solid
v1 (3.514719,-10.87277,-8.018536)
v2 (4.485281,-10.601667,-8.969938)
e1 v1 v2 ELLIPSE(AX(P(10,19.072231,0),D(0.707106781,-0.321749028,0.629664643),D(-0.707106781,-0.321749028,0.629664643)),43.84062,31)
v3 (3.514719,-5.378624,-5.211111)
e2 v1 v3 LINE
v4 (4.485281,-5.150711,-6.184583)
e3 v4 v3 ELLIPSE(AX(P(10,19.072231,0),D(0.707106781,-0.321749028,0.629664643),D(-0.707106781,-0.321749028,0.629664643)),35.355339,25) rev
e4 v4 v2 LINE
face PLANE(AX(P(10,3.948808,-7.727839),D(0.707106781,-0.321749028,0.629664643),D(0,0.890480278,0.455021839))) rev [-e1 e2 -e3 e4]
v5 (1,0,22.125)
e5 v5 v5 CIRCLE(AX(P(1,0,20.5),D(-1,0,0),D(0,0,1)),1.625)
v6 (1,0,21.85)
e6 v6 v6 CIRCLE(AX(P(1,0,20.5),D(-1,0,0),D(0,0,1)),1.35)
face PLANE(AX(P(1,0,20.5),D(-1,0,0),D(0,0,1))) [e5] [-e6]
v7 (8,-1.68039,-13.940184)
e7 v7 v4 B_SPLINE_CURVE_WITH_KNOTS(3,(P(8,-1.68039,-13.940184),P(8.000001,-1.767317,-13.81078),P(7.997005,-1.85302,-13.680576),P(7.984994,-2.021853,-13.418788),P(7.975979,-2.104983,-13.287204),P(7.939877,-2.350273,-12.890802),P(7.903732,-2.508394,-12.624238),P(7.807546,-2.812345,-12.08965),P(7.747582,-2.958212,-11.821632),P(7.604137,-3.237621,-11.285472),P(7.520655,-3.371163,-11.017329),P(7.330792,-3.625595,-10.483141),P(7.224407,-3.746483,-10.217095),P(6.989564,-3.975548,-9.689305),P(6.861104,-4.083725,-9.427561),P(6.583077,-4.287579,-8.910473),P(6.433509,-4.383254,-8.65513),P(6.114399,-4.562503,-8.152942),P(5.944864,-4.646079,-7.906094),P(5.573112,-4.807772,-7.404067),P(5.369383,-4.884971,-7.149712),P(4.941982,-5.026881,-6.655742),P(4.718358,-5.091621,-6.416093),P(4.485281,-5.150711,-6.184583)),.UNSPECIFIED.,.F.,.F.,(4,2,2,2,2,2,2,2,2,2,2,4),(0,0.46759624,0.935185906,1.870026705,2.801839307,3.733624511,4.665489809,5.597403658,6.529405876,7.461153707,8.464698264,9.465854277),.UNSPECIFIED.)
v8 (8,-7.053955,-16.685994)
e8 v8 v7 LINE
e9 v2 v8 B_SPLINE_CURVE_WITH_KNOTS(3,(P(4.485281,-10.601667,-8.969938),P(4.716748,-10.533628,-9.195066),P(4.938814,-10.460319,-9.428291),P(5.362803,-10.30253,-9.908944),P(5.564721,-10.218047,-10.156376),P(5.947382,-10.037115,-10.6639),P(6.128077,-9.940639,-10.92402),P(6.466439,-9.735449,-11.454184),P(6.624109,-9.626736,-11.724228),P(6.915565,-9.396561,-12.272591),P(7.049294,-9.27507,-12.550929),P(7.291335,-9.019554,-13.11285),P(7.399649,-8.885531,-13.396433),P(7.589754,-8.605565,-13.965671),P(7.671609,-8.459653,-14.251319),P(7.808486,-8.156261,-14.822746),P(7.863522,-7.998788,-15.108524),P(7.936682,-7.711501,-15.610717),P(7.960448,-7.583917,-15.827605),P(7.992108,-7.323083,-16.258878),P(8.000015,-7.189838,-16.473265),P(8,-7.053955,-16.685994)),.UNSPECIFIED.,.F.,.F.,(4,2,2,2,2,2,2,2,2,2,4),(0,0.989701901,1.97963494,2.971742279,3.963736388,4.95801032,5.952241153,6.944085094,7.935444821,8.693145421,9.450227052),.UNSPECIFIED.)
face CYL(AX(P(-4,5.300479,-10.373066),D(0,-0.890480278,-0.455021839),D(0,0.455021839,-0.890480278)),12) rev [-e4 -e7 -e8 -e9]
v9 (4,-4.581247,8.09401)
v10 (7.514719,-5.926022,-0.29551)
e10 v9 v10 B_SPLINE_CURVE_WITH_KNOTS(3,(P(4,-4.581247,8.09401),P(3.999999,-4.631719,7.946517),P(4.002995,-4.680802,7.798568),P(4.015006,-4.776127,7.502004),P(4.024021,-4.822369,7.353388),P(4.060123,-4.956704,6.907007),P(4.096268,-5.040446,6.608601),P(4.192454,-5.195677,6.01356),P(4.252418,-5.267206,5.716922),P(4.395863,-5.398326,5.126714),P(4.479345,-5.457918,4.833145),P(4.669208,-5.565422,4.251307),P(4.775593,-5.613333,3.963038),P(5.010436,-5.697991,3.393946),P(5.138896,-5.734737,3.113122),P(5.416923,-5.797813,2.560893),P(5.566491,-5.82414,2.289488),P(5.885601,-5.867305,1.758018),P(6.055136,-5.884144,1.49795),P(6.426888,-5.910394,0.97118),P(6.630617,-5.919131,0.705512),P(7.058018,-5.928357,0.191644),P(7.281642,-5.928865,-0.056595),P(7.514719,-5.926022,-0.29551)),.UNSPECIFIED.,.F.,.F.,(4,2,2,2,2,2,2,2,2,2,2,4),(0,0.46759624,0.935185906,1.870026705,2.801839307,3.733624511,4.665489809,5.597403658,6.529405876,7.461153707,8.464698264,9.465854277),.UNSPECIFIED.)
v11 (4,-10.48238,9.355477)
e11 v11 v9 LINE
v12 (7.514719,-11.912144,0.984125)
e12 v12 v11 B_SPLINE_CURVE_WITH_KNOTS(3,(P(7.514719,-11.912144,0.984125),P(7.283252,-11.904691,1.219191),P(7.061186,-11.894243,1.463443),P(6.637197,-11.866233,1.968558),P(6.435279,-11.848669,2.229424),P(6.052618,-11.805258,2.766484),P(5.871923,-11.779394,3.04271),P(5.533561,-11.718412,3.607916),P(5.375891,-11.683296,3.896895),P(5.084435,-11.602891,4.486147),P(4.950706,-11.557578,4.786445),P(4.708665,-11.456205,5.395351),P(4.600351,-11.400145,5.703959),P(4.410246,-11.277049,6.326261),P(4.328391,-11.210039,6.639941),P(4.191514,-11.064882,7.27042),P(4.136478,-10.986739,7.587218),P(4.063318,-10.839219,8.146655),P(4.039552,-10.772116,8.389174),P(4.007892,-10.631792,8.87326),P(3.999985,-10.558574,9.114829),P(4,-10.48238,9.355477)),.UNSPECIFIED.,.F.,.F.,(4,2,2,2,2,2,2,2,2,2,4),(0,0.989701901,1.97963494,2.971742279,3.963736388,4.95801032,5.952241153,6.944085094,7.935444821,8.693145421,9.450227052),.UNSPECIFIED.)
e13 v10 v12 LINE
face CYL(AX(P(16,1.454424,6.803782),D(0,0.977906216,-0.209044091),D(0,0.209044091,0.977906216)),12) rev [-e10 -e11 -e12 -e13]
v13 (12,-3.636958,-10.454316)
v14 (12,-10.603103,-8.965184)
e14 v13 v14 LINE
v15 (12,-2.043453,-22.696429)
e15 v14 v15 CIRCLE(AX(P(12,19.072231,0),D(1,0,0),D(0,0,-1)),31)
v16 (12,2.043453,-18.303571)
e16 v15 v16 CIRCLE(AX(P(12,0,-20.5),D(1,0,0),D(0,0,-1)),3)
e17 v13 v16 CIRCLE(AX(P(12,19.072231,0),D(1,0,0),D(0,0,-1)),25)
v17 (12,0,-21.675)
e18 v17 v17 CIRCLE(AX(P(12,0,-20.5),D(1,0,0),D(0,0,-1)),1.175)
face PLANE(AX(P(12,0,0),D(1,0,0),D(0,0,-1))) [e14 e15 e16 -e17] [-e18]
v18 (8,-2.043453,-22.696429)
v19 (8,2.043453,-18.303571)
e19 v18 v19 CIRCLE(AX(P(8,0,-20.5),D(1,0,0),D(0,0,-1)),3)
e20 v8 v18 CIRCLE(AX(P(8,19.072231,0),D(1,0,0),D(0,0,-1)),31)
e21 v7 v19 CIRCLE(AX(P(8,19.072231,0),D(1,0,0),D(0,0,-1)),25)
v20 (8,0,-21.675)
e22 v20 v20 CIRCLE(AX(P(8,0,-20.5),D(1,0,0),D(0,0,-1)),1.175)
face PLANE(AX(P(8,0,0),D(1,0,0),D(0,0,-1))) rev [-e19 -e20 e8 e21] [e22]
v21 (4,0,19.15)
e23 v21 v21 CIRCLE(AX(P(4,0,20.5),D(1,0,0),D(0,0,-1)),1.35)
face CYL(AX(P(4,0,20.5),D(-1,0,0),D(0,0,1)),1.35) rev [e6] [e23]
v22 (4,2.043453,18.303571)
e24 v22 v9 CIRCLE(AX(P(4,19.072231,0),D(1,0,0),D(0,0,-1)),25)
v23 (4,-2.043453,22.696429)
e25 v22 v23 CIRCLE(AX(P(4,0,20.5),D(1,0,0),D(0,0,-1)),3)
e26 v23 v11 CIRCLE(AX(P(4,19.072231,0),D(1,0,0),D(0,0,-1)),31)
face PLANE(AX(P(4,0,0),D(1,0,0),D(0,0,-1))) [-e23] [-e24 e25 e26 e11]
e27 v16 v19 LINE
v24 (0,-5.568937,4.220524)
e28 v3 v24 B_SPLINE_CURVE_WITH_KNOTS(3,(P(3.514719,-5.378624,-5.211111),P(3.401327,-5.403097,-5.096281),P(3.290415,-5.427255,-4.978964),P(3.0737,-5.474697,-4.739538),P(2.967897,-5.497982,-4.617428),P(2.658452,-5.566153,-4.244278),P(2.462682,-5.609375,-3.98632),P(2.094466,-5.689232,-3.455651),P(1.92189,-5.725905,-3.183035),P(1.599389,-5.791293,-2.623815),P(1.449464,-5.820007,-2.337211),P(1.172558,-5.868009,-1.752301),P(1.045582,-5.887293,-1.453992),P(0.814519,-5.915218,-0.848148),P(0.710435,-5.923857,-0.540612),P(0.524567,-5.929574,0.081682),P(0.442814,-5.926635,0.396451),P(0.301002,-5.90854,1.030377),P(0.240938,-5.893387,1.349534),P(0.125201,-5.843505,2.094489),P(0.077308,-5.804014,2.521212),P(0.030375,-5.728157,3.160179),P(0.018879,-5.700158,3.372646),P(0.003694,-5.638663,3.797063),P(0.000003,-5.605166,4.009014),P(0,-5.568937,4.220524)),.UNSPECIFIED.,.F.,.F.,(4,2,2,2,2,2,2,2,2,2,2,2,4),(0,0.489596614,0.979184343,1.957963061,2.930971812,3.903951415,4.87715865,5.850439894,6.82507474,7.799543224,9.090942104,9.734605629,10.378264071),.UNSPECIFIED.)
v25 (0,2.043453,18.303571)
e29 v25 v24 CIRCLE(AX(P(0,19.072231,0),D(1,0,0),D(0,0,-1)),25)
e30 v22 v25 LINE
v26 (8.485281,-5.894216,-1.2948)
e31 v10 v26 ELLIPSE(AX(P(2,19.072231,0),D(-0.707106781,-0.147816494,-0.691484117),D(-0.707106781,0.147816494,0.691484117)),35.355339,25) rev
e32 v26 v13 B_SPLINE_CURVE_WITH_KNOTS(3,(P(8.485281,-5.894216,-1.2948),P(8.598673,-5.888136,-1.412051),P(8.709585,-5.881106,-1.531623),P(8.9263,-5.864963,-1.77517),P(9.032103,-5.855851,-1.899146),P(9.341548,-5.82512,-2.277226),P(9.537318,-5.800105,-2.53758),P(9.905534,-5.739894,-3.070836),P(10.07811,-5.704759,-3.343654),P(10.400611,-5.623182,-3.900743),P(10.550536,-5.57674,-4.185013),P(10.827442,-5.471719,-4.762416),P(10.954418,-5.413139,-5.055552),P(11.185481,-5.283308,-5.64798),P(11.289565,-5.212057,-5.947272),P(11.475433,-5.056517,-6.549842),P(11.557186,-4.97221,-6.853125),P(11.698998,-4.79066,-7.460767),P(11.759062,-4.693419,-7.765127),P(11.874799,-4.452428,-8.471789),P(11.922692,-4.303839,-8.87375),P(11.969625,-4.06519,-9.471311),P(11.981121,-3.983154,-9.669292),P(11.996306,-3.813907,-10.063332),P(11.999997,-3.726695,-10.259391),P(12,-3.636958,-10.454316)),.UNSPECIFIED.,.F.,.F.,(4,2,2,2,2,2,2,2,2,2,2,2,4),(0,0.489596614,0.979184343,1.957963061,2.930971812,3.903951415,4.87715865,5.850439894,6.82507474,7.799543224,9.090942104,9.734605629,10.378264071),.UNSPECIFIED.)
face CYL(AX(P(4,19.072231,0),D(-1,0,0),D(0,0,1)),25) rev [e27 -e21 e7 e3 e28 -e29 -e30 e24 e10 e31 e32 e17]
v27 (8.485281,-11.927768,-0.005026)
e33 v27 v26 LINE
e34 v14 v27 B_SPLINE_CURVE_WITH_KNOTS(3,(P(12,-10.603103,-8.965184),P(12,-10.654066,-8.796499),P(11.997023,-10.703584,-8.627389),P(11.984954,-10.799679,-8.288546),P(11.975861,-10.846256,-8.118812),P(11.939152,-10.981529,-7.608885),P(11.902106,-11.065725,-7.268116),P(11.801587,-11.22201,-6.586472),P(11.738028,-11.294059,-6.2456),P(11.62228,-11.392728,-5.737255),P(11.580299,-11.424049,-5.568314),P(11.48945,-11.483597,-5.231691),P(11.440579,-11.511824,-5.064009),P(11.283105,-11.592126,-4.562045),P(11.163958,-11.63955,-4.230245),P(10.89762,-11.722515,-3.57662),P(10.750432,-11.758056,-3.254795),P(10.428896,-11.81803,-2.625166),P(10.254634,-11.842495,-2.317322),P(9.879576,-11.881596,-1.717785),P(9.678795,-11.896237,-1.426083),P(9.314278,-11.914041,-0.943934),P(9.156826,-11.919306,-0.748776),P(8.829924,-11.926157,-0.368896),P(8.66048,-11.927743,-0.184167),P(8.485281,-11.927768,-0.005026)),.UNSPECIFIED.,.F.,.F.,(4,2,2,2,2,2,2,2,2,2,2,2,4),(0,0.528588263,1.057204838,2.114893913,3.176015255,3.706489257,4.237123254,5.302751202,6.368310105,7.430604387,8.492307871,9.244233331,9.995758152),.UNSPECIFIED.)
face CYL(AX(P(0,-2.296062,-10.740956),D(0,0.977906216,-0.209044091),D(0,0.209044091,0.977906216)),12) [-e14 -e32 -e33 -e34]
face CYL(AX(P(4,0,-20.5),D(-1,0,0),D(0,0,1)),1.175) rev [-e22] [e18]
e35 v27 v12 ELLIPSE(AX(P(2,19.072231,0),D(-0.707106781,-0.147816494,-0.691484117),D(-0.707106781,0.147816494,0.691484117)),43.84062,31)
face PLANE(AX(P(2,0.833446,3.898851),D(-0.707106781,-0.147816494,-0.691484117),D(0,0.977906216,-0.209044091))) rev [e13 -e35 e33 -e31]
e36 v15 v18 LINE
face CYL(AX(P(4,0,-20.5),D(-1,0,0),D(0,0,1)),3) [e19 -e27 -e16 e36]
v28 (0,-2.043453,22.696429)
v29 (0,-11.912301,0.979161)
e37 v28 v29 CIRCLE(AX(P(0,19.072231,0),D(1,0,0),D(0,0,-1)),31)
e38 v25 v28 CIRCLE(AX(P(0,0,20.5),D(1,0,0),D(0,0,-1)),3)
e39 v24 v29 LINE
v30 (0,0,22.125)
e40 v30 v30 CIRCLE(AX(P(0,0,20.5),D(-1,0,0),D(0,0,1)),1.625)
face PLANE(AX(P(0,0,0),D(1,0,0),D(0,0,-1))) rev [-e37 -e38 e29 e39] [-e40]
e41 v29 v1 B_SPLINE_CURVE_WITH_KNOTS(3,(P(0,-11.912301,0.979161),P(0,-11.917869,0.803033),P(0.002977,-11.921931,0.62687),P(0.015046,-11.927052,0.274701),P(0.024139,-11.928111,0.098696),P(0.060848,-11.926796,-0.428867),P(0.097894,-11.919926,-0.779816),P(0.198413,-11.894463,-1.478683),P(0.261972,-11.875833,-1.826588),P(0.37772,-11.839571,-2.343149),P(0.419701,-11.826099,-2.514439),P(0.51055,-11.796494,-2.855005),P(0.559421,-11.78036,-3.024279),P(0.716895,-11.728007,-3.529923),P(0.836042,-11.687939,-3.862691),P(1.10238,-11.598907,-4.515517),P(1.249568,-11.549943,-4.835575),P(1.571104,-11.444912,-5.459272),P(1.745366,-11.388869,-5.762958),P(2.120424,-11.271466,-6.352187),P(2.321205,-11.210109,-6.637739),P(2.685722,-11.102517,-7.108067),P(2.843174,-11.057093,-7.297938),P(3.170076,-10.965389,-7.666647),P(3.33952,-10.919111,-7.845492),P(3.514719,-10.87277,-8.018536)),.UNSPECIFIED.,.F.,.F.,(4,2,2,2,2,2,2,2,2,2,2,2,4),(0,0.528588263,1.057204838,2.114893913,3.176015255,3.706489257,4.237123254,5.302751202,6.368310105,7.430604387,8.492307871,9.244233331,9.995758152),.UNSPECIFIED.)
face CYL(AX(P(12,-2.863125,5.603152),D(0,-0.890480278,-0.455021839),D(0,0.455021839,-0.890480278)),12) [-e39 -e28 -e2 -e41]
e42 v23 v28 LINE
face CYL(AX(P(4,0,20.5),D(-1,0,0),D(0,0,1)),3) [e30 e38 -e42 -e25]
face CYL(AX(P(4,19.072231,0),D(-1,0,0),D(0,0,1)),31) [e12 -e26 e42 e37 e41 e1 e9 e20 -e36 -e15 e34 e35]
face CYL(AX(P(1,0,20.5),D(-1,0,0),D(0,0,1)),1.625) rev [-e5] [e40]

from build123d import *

# Parameters (mm, degrees)
SKETCH_1_R          = 1.175
SKETCH_1_R_2        = 1.35
EXTRUDE_1_DEPTH     = 4
SKETCH_1_5_R        = 1.175
EXTRUDE_2_DEPTH     = 12
SKETCH_1_6_R        = 1.175
CUT_EXTRUDE_1_DEPTH = 8
SKETCH_3_R          = 1.625
CUT_EXTRUDE_2_DEPTH = 1
CHAMFER_1_SIZE      = 10
FILLET_1_R          = 12


with BuildPart() as part:
    # 草图1 → 凸台-拉伸1 (new body)
    with BuildSketch(Plane(origin=(0, 0, 0), x_dir=(0, 0, -1), z_dir=(1, 0, 0))):
        with BuildLine():
            ThreePointArc((-22.696428571, -2.043453335), (0, -11.927768877), (22.696428571, -2.043453335))
            ThreePointArc((22.696428571, -2.043453335), (22.543453335, 2.196428571), (18.303571429, 2.043453335))
            ThreePointArc((18.303571429, 2.043453335), (0, -5.927768877), (-18.303571429, 2.043453335))
            ThreePointArc((-18.303571429, 2.043453335), (-22.543453335, 2.196428571), (-22.696428571, -2.043453335))
        make_face()
        with Locations((20.5, 0)):
            Circle(SKETCH_1_R, mode=Mode.SUBTRACT)
        with Locations((-20.5, 0)):
            Circle(SKETCH_1_R_2, mode=Mode.SUBTRACT)
    extrude(amount=EXTRUDE_1_DEPTH)

    # 草图1<5> → 凸台-拉伸2 (add)
    # profile 1 of 2: a face of its own
    with BuildSketch(Plane(origin=(0, 0, 0), x_dir=(0, 0, -1), z_dir=(1, 0, 0))):
        with BuildLine():
            Line((-5.226102274, -5.375424287), (-6.48036682, -11.242861585))
            ThreePointArc((-6.48036682, -11.242861585), (4.046311959, -11.66255958), (14.105677022, -8.532657498))
            Line((14.105677022, -8.532657498), (11.375545986, -3.189775829))
            ThreePointArc((11.375545986, -3.189775829), (3.263154806, -5.713890412), (-5.226102274, -5.375424287))
        make_face()
    # profile 2 of 2: a face of its own
    with BuildSketch(Plane(origin=(0, 0, 0), x_dir=(0, 0, -1), z_dir=(1, 0, 0))):
        with BuildLine():
            Line((11.375545986, -3.189775829), (14.105677022, -8.532657498))
            ThreePointArc((14.105677022, -8.532657498), (18.684918697, -5.663852102), (22.696428571, -2.043453335))
            ThreePointArc((22.696428571, -2.043453335), (22.543453335, 2.196428571), (18.303571429, 2.043453335))
            ThreePointArc((18.303571429, 2.043453335), (15.06848282, -0.876223091), (11.375545986, -3.189775829))
        make_face()
        with Locations((20.5, 0)):
            Circle(SKETCH_1_5_R, mode=Mode.SUBTRACT)
    extrude(amount=EXTRUDE_2_DEPTH)

    # 草图1<6> → 切除-拉伸1 (cut)
    with BuildSketch(Plane(origin=(0, 0, 0), x_dir=(0, 0, -1), z_dir=(1, 0, 0))):
        with BuildLine():
            Line((11.375545986, -3.189775829), (14.105677022, -8.532657498))
            ThreePointArc((14.105677022, -8.532657498), (18.684918697, -5.663852102), (22.696428571, -2.043453335))
            ThreePointArc((22.696428571, -2.043453335), (22.543453335, 2.196428571), (18.303571429, 2.043453335))
            ThreePointArc((18.303571429, 2.043453335), (15.06848282, -0.876223091), (11.375545986, -3.189775829))
        make_face()
        with Locations((20.5, 0)):
            Circle(SKETCH_1_6_R, mode=Mode.SUBTRACT)
    extrude(amount=CUT_EXTRUDE_1_DEPTH, mode=Mode.SUBTRACT)

    # 草图3 → 切除-拉伸2 (cut)
    with BuildSketch(Plane.ZY):
        with Locations((20.5, 0)):
            Circle(SKETCH_3_R)
    extrude(amount=-CUT_EXTRUDE_2_DEPTH, mode=Mode.SUBTRACT)

    # 倒角1
    # the kernel refuses this chamfer: 10 mm, written as the material it adds along each edge
    # the kernel refuses this chamfer: 10 mm, written as the material it takes off along each edge
    with BuildSketch(Plane(origin=(12, 19.773223518, -0.149849051), x_dir=(-0.9996219169112968, 0.005747850531589265, 0.02688838866222917), z_dir=(0, -0.9779062163770691, 0.20904409097385418))) as chamfer_1_2_piece_1_section:
        Polygon((CHAMFER_1_SIZE * 0.999621916911, CHAMFER_1_SIZE * 0.0274958766106), (-CHAMFER_1_SIZE * 0.0274958766106, CHAMFER_1_SIZE * 0.999621916911), (0, 0), align=None)
    chamfer_1_2_piece_1 = extrude(amount=57.433659759, mode=Mode.PRIVATE)
    chamfer_1_2_piece_1 = split(chamfer_1_2_piece_1, bisect_by=Plane(origin=(4, -8.720114363, 2.38807711), z_dir=(1, 0, 0)), keep=Keep.TOP, mode=Mode.PRIVATE)
    add(chamfer_1_2_piece_1, mode=Mode.SUBTRACT)
    with BuildSketch(Plane(origin=(0, 19.710553993, 0.32617325), x_dir=(-0.02749587661058638, -0.45484980336482234, 0.8901436025430942), z_dir=(0, -0.8904802780770589, -0.45502183942730046))) as chamfer_1_2_piece_2_section:
        Polygon((CHAMFER_1_SIZE * 0.999621916911, -CHAMFER_1_SIZE * 0.0274958766106), (-CHAMFER_1_SIZE * 0.0274958766106, -CHAMFER_1_SIZE * 0.999621916911), (0, 0), align=None)
    chamfer_1_2_piece_2 = extrude(amount=57.433659759, mode=Mode.PRIVATE)
    chamfer_1_2_piece_2 = split(chamfer_1_2_piece_2, bisect_by=Plane(origin=(8, -7.155033318, -9.499893675), z_dir=(-1, 0, 0)), keep=Keep.TOP, mode=Mode.PRIVATE)
    add(chamfer_1_2_piece_2, mode=Mode.SUBTRACT)

    # 圆角1
    fillet_1_edges = [part.edges().sort_by_distance(p)[0] for p in [
        (12, -8.568786932, -4.317191604),
        (8, -6.706828834, -10.92672743),
        (4, -8.656473826, 3.88229654),
        (0, -8.74431349, -2.983935031),
    ]]
    fillet(fillet_1_edges, radius=FILLET_1_R)


solid = part.part
